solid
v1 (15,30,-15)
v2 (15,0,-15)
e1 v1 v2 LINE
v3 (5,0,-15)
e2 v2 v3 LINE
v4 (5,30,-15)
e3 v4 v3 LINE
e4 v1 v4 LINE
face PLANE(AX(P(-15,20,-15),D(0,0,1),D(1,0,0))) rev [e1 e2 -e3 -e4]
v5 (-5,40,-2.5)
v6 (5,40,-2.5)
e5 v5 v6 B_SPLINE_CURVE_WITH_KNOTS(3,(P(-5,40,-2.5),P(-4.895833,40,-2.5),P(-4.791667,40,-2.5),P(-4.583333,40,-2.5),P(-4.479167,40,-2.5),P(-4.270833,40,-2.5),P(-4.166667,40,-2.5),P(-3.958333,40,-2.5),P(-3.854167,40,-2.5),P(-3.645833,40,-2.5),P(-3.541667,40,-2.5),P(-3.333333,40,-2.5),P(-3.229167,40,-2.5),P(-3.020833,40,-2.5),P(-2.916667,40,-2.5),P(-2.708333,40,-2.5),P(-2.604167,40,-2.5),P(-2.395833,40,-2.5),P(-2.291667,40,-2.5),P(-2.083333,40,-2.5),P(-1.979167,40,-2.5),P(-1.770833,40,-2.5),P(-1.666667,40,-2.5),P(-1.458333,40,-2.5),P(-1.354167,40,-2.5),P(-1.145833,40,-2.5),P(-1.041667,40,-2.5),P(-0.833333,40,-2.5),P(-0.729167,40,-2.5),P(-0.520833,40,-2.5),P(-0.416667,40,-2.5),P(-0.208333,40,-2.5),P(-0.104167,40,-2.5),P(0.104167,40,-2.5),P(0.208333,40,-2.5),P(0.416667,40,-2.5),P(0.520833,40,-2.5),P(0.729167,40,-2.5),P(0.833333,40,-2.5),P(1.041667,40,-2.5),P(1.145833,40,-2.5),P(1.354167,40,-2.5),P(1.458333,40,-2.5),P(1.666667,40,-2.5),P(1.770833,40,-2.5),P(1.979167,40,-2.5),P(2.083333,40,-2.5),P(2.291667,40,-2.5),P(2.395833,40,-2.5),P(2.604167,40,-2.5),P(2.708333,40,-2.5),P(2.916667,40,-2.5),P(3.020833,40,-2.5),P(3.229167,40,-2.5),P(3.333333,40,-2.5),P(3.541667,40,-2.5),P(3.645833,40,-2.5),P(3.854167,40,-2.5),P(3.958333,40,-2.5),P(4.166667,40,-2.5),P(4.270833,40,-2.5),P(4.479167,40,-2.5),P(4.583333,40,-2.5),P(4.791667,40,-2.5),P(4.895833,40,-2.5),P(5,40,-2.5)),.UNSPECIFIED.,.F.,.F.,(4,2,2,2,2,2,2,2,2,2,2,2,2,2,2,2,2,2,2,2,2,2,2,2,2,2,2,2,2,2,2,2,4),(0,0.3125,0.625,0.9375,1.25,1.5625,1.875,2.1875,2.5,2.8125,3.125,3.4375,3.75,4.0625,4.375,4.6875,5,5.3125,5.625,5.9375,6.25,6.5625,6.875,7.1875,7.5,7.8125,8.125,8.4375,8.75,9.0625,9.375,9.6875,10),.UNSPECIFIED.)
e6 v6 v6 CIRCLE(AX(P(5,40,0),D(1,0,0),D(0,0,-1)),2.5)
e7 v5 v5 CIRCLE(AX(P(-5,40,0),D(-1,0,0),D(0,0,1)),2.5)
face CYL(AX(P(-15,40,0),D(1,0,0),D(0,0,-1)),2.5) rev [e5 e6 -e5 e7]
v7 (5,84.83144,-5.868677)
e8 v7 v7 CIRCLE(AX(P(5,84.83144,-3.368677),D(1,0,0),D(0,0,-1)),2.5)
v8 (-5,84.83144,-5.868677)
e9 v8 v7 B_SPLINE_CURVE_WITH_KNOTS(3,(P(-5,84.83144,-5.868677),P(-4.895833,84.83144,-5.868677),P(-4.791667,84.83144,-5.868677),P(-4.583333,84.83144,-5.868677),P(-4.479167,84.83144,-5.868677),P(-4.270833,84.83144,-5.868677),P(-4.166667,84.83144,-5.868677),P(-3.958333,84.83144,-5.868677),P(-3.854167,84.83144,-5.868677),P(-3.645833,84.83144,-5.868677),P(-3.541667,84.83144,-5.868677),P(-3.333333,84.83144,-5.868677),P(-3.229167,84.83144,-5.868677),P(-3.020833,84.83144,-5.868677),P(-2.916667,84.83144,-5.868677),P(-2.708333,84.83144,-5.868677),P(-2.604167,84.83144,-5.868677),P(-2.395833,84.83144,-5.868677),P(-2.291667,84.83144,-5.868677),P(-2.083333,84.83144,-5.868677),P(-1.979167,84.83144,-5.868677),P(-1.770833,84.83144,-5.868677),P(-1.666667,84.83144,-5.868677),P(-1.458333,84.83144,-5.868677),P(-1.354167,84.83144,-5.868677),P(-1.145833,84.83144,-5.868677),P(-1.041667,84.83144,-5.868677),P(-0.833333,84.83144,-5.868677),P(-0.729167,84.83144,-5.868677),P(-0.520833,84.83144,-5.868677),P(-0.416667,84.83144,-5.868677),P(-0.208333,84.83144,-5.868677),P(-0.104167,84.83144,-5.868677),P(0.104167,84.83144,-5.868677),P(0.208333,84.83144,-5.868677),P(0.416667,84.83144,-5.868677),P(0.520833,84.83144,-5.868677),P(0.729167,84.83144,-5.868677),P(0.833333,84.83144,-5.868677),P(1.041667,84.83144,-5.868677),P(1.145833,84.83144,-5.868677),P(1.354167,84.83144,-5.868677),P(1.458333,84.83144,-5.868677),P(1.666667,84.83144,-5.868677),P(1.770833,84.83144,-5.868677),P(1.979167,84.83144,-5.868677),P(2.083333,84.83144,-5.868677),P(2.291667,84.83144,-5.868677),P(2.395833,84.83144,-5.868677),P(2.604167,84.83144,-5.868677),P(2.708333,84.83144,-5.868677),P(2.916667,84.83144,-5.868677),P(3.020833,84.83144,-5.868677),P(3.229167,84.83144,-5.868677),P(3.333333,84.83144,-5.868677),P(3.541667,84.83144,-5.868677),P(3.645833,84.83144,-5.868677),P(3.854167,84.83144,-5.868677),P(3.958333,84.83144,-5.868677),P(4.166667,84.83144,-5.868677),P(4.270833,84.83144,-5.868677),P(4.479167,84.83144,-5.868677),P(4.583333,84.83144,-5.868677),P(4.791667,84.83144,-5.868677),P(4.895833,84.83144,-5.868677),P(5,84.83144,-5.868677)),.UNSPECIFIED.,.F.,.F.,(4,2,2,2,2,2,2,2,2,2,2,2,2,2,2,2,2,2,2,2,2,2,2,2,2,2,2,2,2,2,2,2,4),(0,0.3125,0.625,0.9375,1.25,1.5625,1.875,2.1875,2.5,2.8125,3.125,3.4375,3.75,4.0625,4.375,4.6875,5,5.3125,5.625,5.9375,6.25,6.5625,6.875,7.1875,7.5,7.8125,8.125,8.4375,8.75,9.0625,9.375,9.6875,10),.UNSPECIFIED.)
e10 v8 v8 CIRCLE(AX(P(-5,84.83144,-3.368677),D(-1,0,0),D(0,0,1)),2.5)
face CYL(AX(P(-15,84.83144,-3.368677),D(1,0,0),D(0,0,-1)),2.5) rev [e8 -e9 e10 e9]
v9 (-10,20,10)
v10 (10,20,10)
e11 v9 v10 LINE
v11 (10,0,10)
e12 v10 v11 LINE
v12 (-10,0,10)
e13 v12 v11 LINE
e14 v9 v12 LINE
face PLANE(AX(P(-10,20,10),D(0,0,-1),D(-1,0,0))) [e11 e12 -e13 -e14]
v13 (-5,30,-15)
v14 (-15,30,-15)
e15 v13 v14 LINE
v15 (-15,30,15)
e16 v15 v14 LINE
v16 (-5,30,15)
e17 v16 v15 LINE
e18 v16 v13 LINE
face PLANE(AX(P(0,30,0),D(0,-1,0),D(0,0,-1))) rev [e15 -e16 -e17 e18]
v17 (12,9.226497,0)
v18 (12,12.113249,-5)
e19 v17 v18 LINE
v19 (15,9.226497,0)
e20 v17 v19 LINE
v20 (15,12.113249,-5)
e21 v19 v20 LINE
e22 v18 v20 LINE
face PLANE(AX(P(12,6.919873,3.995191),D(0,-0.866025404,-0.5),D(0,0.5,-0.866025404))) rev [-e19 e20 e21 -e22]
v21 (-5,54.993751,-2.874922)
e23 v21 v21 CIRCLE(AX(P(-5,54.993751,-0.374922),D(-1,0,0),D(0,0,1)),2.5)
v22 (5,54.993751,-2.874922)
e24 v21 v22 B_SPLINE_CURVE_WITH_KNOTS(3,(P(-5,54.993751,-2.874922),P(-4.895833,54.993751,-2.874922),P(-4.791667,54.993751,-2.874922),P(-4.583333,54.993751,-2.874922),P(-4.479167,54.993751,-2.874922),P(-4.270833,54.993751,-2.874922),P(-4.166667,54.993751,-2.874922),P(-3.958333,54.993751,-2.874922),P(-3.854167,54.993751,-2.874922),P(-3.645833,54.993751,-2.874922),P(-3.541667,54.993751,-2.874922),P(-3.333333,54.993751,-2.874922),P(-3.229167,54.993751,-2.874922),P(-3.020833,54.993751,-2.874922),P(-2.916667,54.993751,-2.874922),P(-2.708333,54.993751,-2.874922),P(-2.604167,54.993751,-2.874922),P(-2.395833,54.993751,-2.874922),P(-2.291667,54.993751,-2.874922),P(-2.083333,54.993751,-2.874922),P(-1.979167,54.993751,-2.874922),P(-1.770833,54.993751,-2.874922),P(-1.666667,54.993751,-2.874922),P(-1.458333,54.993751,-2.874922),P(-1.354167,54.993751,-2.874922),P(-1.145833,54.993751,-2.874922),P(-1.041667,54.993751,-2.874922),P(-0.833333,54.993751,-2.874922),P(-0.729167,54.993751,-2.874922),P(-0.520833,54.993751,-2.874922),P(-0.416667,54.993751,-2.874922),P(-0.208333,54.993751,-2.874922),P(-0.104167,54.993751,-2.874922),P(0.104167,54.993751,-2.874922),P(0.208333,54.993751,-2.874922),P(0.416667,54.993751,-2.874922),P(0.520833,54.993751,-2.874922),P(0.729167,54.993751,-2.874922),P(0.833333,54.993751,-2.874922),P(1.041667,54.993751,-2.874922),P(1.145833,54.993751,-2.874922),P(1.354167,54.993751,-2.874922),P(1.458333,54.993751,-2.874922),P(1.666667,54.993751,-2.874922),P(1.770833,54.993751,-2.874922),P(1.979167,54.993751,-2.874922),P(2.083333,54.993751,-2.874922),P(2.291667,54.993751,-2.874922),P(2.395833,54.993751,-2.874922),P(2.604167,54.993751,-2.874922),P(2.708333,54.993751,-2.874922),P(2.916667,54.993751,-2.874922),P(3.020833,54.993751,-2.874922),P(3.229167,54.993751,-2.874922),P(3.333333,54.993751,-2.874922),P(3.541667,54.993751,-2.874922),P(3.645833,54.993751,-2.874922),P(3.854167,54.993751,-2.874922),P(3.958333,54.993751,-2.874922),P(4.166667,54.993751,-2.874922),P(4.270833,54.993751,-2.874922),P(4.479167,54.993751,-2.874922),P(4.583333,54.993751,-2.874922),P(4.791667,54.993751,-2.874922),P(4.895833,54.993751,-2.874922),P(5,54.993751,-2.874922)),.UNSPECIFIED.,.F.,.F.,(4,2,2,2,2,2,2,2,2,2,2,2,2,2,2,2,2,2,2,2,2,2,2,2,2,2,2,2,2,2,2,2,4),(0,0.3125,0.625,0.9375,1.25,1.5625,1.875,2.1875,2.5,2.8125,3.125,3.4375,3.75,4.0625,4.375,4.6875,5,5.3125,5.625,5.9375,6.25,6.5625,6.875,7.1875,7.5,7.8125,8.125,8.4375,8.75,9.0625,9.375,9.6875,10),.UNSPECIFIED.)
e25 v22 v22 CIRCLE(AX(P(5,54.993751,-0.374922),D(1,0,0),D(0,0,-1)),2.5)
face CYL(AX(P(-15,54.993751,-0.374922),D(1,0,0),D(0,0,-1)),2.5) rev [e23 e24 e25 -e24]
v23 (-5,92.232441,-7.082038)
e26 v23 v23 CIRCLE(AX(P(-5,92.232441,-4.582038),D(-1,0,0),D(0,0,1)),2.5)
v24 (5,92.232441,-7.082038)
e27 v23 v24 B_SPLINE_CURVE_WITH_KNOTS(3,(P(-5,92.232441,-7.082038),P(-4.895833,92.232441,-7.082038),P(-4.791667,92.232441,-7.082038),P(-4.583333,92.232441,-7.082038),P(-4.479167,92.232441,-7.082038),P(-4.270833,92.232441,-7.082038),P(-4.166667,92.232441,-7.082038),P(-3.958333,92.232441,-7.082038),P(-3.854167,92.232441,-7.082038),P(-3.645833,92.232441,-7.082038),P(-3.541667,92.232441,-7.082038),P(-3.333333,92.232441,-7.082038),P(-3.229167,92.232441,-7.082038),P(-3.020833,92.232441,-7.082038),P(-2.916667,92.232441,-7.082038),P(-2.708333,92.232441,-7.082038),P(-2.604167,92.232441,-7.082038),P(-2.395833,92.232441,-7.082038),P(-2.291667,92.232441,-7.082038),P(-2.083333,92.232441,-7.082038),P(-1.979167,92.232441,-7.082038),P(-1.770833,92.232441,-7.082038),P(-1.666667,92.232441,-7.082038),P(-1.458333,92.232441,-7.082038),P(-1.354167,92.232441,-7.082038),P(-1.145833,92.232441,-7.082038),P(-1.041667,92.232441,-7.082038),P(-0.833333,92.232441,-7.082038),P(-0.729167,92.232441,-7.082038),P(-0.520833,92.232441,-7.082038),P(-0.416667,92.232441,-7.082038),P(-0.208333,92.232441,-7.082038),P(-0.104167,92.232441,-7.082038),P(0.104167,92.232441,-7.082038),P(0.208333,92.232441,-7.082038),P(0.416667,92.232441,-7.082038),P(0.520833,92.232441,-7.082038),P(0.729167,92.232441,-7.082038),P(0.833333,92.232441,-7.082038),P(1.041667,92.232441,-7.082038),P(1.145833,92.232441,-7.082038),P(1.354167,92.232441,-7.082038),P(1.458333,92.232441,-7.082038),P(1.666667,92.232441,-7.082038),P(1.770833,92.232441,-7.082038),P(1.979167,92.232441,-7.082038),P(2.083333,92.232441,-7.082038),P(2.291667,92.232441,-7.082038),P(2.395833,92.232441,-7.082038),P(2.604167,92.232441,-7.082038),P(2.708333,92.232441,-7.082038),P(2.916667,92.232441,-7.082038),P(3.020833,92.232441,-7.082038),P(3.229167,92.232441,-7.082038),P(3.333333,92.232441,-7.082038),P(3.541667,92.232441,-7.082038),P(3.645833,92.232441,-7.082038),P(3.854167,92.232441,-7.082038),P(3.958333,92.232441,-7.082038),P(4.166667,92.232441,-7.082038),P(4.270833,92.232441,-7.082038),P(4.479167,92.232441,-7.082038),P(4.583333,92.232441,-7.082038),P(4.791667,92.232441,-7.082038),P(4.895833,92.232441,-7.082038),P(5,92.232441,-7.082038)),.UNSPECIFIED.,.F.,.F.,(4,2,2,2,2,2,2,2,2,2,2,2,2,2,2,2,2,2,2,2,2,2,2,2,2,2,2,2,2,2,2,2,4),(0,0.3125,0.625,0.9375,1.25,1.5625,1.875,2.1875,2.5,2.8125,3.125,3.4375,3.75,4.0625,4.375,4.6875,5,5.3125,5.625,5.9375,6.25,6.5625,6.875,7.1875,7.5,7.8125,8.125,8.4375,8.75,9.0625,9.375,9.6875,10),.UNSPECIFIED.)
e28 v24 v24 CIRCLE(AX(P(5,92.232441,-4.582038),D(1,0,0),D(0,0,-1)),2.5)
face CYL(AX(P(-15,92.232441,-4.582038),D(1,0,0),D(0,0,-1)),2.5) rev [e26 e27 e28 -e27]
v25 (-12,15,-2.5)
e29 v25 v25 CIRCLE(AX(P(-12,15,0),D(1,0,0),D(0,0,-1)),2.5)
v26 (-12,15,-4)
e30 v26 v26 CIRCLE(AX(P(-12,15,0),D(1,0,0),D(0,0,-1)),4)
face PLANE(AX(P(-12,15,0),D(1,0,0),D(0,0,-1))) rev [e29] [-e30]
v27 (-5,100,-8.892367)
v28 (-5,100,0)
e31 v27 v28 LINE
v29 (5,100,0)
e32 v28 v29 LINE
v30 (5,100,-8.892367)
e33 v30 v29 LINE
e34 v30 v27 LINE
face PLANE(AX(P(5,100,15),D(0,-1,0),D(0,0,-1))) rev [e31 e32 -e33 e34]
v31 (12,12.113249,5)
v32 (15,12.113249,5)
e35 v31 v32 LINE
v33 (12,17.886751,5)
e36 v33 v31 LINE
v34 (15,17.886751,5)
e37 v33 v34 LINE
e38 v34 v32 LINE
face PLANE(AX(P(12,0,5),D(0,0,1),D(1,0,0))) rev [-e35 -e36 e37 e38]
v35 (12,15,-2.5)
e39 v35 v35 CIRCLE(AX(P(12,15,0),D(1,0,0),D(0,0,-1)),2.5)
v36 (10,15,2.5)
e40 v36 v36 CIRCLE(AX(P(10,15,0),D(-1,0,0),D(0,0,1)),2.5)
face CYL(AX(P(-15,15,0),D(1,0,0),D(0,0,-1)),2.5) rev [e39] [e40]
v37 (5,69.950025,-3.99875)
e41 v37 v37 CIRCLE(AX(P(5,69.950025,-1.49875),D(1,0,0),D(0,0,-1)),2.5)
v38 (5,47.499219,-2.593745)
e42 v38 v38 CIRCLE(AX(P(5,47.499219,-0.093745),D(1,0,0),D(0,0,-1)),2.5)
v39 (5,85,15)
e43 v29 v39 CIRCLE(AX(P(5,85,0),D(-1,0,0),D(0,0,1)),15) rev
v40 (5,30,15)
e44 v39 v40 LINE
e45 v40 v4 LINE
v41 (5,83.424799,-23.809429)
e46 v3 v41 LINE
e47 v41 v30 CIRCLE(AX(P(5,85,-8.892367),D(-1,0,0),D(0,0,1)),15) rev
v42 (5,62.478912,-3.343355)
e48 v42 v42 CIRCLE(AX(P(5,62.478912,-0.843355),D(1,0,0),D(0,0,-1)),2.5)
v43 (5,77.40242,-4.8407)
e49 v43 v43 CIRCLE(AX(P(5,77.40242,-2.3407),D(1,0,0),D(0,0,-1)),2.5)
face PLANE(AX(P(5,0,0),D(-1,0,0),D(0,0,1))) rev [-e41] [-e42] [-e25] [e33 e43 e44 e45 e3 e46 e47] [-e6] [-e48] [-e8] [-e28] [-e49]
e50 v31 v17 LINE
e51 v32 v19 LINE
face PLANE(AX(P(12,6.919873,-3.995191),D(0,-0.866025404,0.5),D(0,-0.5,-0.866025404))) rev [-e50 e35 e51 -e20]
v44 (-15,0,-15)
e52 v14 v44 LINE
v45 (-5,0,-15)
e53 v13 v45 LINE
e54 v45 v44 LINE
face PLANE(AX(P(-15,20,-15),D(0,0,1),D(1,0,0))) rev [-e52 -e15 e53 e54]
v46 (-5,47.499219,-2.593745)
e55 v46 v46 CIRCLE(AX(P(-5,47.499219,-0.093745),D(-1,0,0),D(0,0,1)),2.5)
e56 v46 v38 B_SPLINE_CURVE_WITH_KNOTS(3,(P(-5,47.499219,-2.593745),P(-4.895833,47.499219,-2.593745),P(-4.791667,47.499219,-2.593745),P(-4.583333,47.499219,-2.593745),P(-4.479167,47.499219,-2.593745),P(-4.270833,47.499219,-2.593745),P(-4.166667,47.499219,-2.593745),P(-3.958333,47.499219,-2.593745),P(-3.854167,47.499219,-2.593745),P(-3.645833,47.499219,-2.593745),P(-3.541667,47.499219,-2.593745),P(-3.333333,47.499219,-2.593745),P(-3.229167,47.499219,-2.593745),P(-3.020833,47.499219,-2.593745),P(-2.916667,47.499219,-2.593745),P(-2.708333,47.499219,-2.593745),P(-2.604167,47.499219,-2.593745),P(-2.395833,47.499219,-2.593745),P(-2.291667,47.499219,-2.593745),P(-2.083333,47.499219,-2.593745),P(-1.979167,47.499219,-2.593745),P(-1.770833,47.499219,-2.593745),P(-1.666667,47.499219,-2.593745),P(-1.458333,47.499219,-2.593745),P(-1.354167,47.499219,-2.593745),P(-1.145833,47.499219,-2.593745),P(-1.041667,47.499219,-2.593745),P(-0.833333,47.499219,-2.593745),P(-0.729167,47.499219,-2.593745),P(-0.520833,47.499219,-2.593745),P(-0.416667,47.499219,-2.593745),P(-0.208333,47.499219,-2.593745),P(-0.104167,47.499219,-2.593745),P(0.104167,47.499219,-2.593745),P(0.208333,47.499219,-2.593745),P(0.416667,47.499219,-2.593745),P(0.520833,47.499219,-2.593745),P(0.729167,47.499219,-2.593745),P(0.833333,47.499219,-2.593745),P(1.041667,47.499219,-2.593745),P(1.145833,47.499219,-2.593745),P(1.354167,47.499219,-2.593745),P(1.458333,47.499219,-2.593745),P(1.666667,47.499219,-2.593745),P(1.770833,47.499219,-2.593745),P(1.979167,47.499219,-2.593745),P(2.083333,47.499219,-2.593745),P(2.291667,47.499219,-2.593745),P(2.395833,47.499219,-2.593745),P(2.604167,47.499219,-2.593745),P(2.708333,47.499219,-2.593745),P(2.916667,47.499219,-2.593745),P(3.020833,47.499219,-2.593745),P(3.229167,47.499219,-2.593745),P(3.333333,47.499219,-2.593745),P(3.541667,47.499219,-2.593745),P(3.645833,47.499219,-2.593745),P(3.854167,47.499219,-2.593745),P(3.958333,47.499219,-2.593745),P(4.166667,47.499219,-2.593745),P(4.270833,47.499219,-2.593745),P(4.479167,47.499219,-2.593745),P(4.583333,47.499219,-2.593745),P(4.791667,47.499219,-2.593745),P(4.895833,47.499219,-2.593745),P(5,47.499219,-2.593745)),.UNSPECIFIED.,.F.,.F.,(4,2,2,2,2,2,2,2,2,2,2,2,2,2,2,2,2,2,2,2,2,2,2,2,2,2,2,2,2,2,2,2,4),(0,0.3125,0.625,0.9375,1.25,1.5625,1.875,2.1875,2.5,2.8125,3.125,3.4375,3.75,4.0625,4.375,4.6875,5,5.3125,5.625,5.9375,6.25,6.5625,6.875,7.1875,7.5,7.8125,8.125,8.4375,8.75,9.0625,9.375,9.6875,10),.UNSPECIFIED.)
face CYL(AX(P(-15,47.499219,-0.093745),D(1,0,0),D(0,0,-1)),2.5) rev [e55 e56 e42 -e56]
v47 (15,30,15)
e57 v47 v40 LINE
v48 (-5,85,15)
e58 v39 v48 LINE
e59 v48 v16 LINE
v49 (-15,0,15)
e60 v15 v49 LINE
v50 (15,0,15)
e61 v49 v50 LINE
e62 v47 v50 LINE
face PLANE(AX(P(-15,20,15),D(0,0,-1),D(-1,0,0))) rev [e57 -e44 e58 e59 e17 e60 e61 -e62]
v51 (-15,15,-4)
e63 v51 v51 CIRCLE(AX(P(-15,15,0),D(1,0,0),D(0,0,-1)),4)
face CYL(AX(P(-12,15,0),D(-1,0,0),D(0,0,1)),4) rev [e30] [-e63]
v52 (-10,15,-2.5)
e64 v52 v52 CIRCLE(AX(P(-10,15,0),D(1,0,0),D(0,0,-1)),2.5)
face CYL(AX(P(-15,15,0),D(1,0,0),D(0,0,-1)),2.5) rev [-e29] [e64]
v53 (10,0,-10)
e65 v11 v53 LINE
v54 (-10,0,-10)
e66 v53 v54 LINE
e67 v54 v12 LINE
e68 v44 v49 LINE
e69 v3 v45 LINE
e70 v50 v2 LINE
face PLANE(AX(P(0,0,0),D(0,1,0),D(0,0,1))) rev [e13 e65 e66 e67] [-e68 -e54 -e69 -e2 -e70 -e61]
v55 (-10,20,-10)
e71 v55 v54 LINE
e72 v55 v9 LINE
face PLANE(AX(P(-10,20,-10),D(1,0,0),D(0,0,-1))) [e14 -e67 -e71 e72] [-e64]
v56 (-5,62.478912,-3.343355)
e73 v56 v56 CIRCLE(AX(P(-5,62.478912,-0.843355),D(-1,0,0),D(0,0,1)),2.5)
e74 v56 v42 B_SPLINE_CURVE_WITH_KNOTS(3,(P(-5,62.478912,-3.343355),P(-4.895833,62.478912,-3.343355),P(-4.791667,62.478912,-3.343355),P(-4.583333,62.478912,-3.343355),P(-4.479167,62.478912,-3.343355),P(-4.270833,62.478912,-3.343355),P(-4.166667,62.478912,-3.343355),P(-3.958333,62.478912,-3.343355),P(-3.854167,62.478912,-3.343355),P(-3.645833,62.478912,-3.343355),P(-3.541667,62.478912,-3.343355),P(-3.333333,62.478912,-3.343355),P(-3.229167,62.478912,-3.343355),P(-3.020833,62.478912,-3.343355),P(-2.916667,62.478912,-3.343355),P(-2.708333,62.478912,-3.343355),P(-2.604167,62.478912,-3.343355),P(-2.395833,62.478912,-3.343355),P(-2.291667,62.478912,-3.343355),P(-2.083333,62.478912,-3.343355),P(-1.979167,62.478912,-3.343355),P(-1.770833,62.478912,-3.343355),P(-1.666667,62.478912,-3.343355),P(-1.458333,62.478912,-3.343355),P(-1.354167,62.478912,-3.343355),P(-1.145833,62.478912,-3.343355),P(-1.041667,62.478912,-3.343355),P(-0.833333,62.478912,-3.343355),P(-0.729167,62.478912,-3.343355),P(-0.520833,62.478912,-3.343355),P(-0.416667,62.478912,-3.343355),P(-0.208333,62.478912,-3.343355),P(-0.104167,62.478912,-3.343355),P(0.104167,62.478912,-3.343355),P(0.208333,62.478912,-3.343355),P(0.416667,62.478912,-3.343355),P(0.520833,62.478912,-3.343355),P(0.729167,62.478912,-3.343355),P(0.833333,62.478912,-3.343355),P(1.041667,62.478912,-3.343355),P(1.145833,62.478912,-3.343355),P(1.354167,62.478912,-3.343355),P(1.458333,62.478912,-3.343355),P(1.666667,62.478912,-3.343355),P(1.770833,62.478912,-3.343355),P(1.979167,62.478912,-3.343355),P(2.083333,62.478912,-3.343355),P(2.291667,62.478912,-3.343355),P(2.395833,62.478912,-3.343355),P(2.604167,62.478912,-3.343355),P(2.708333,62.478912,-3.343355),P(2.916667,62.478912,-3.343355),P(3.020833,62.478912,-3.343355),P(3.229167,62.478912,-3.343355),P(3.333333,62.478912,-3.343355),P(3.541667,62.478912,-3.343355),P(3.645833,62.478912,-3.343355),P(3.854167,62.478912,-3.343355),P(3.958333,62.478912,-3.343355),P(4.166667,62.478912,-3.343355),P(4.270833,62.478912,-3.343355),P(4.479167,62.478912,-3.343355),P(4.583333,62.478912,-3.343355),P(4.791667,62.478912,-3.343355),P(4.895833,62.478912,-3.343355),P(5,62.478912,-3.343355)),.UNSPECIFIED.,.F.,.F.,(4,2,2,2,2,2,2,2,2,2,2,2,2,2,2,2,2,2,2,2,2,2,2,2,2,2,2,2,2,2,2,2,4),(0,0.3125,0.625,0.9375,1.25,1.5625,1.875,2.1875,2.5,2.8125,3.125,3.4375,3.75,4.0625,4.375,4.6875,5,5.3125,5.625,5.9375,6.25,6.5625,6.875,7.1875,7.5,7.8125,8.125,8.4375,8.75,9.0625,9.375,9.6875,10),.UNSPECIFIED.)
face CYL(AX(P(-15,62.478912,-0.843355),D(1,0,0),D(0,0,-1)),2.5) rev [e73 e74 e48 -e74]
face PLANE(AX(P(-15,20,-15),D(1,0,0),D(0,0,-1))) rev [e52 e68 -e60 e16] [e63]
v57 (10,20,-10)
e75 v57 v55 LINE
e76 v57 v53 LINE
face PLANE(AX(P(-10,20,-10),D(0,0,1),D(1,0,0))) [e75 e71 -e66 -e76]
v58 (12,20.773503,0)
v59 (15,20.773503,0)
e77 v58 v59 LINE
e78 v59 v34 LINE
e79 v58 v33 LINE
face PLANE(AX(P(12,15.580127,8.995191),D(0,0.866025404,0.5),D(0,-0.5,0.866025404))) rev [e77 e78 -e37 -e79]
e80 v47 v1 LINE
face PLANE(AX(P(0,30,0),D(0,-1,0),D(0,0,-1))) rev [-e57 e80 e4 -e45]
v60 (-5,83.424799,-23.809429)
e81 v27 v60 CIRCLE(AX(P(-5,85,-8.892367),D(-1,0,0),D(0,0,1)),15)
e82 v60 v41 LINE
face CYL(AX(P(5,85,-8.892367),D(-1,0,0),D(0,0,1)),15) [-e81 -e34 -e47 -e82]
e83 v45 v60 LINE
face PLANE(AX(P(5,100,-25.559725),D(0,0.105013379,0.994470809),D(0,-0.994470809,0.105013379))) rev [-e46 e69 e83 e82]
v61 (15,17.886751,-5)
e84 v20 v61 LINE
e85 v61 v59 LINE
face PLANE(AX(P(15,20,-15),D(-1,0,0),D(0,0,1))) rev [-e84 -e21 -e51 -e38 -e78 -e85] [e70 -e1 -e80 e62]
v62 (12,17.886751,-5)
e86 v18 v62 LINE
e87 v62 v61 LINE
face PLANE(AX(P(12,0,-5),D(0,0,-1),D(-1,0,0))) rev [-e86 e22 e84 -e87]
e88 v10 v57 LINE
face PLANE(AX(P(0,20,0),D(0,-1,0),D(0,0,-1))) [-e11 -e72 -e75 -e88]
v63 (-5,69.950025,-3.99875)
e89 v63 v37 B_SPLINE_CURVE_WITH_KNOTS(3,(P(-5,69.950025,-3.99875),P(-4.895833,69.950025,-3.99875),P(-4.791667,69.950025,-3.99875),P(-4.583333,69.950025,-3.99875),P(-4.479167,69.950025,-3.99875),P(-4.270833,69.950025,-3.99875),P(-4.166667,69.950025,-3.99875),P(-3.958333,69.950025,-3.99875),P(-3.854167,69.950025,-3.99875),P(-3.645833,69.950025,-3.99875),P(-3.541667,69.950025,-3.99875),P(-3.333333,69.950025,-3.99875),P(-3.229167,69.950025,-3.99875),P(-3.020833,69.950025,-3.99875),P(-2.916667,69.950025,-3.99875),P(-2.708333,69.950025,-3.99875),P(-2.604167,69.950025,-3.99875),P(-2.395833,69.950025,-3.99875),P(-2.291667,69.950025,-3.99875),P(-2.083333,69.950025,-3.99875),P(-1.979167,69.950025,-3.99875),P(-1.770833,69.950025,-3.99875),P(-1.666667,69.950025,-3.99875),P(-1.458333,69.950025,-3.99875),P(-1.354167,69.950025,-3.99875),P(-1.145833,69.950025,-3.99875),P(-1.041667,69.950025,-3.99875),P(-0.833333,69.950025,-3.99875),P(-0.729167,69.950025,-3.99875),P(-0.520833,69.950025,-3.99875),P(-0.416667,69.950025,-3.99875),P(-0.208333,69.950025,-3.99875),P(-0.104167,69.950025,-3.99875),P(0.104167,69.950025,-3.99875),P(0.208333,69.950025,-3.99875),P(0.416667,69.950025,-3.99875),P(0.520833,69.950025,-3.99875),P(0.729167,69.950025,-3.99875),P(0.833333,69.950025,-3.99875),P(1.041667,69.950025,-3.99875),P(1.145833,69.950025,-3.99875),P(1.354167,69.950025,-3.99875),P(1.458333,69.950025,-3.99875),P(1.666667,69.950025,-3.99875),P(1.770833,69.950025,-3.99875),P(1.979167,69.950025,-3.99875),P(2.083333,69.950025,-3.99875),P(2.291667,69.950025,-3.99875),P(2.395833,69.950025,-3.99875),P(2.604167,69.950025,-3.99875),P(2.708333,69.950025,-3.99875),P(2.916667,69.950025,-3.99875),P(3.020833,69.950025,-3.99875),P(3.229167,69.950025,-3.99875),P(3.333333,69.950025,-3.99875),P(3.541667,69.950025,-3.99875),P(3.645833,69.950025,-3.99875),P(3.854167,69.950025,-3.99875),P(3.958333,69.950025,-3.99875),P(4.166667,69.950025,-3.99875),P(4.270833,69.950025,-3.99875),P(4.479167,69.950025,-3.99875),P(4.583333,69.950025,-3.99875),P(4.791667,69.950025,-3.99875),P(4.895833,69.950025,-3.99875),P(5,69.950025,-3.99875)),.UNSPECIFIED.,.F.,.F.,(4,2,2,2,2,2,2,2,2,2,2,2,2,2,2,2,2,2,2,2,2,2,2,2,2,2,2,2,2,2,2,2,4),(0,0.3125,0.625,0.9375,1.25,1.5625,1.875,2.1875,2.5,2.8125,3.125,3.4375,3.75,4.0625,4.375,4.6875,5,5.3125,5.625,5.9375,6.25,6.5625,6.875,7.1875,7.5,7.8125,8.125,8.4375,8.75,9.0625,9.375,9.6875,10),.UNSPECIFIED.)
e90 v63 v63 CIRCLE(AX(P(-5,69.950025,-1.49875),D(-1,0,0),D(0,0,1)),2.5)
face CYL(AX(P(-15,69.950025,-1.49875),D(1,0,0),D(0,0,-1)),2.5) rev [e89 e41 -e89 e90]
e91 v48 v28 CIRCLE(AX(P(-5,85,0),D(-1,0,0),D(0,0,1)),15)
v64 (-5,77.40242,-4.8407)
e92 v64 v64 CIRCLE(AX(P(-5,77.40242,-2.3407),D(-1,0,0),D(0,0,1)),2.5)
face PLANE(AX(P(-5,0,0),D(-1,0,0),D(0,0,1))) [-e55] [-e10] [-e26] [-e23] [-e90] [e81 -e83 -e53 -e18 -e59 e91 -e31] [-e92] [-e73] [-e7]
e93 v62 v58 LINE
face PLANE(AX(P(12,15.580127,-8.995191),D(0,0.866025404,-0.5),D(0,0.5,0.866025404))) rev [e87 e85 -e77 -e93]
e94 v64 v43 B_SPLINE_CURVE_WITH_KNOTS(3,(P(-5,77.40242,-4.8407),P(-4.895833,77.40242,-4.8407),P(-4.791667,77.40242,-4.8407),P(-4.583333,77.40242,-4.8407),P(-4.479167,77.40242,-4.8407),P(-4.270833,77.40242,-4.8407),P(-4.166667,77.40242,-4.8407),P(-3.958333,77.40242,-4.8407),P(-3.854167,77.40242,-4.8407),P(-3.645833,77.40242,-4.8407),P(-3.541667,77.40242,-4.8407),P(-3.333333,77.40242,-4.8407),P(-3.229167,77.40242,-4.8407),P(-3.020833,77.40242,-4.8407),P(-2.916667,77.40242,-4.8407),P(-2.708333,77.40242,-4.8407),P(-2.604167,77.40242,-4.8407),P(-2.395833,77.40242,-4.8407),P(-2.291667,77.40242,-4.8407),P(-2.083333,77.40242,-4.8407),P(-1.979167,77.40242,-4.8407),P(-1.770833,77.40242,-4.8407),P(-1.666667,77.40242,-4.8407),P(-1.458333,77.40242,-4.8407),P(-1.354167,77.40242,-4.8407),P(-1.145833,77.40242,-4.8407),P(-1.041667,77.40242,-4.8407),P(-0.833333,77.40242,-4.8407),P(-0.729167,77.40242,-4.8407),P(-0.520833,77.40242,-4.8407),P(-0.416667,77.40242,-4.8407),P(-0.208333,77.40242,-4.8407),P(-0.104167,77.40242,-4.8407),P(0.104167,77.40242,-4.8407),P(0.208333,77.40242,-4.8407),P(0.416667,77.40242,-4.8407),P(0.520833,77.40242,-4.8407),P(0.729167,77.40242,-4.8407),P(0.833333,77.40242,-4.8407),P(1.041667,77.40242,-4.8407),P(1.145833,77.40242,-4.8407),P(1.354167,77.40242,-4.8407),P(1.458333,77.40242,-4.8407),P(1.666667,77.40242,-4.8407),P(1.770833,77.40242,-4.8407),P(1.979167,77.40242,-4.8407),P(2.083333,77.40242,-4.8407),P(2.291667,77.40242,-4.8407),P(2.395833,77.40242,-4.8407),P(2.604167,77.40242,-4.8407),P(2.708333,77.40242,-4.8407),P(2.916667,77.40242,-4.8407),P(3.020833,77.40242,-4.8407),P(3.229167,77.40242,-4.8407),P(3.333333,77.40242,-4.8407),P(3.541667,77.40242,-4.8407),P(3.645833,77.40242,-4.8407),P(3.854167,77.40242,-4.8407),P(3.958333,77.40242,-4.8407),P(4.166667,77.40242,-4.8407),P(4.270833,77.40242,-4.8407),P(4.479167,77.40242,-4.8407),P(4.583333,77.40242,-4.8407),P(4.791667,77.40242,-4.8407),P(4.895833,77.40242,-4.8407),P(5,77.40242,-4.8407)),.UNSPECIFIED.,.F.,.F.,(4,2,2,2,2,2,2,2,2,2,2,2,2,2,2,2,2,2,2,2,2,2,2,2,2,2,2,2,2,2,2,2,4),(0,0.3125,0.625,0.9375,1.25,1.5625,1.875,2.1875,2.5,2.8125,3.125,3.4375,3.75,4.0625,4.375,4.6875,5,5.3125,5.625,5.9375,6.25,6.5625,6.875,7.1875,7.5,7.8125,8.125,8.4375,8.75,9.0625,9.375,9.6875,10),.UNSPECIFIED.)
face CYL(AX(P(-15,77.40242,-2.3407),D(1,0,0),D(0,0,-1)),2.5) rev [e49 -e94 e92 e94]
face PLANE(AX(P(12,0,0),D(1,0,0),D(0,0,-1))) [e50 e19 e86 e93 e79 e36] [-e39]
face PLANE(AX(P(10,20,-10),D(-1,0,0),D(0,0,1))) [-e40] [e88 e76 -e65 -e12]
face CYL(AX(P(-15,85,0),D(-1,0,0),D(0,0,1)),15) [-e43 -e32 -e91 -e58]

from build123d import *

# Parameters (mm, degrees)
SKETCH1_W             = 30
SKETCH1_H             = 30
SKETCH1_W_2           = 20
SKETCH1_H_2           = 20
BOSS_EXTRUDE1_DEPTH   = 20
BOSS_EXTRUDE2_START   = 20
SKETCH1_2_W           = 30
SKETCH1_2_H           = 30
SKETCH1_2_W_2         = 20
SKETCH1_2_H_2         = 20
BOSS_EXTRUDE2_DEPTH   = 10
SKETCH3_R             = 2.5
CUT_EXTRUDE1_DEPTH    = 46
SKETCH3_3_R           = 4
SKETCH3_3_R_2         = 2.5
CUT_EXTRUDE2_DEPTH    = 3
CUT_EXTRUDE3_START    = -27
SKETCH3_4_R           = 4
SKETCH3_4_R_2         = 2.5
CUT_EXTRUDE3_DEPTH    = 3
BOSS_EXTRUDE4_DEPTH   = 5
FILLET2_R             = 15
SKETCH7_R             = 2.5
CUT_EXTRUDE5_DEPTH    = 105.74180253
CRVPATTERN1_START     = -5
CRVPATTERN1_OUTLINE_R = 2.5
CRVPATTERN1_DEPTH     = 10


# Read off the part's stored shape, not the designer's step: CrvPattern1
with BuildPart() as part:
    # Sketch1 → Boss-Extrude1 (new body)
    with BuildSketch(Plane(origin=(0, 0, 0), x_dir=(1, 0, 0), z_dir=(0, 1, 0))):
        Rectangle(SKETCH1_W, SKETCH1_H)
        Rectangle(SKETCH1_W_2, SKETCH1_H_2, mode=Mode.SUBTRACT)
    extrude(amount=BOSS_EXTRUDE1_DEPTH)

    # Sketch1<2> → Boss-Extrude2 (add)
    # profile 1 of 2: a face of its own
    with BuildSketch(Plane(origin=(0, 0, 0), x_dir=(1, 0, 0), z_dir=(0, 1, 0)).offset(BOSS_EXTRUDE2_START)):
        Rectangle(SKETCH1_2_W, SKETCH1_2_H)
        Rectangle(SKETCH1_2_W_2, SKETCH1_2_H_2, mode=Mode.SUBTRACT)
    # profile 2 of 2: a face of its own
    with BuildSketch(Plane(origin=(0, 0, 0), x_dir=(1, 0, 0), z_dir=(0, 1, 0)).offset(BOSS_EXTRUDE2_START)):
        Rectangle(SKETCH1_2_W_2, SKETCH1_2_H_2)
    extrude(amount=BOSS_EXTRUDE2_DEPTH)

    # Sketch3 → Cut-Extrude1 (cut, through all)
    with BuildSketch(Plane(origin=(15, 0, 0), x_dir=(0, 0, -1), z_dir=(1, 0, 0))):
        with Locations((0, 15)):
            Circle(SKETCH3_R)
    extrude(amount=-CUT_EXTRUDE1_DEPTH, mode=Mode.SUBTRACT)

    # Sketch3<3> → Cut-Extrude2 (cut)
    # profile 1 of 2: a face of its own
    with BuildSketch(Plane(origin=(15, 0, 0), x_dir=(0, 0, -1), z_dir=(1, 0, 0))):
        Polygon((-5, 17.886751346), (-5, 12.113248654), (0, 9.226497308), (5, 12.113248654), (5, 17.886751346), (0, 20.773502692), align=None)
        with Locations((0, 15)):
            Circle(SKETCH3_3_R, mode=Mode.SUBTRACT)
    # profile 2 of 2: a face of its own
    with BuildSketch(Plane(origin=(15, 0, 0), x_dir=(0, 0, -1), z_dir=(1, 0, 0))):
        with Locations((0, 15)):
            Circle(SKETCH3_3_R)
        with Locations((0, 15)):
            Circle(SKETCH3_3_R_2, mode=Mode.SUBTRACT)
    extrude(amount=-CUT_EXTRUDE2_DEPTH, mode=Mode.SUBTRACT)

    # Sketch3<4> → Cut-Extrude3 (cut)
    with BuildSketch(Plane(origin=(15, 0, 0), x_dir=(0, 0, -1), z_dir=(1, 0, 0)).offset(CUT_EXTRUDE3_START)):
        with Locations((0, 15)):
            Circle(SKETCH3_4_R)
        with Locations((0, 15)):
            Circle(SKETCH3_4_R_2, mode=Mode.SUBTRACT)
    extrude(amount=-CUT_EXTRUDE3_DEPTH, mode=Mode.SUBTRACT)

    # Sketch6 → Boss-Extrude4 (add, symmetric)
    with BuildSketch(Plane(origin=(0, 0, 0), x_dir=(0, 0, -1), z_dir=(1, 0, 0))):
        Polygon((-15, 30), (-15, 100), (25.559724605, 100), (15, 0), (15, 30), align=None)
    extrude(amount=BOSS_EXTRUDE4_DEPTH, both=True)

    # Fillet2
    fillet2_edges = [part.edges().sort_by_distance(p)[0] for p in [
        (0, 100, -25.559724605),
        (0, 100, 15),
    ]]
    fillet(fillet2_edges, radius=FILLET2_R)

    # Sketch7 → Cut-Extrude5 (cut, through all)
    with BuildSketch(Plane(origin=(5, 0, 0), x_dir=(0, 0, -1), z_dir=(1, 0, 0))):
        with Locations((0, 40)):
            Circle(SKETCH7_R)
    extrude(amount=-CUT_EXTRUDE5_DEPTH, mode=Mode.SUBTRACT)

    # CrvPattern1 outline → CrvPattern1 (cut)
    with BuildSketch(Plane.YZ.offset(CRVPATTERN1_START)):
        with Locations((47.499218774, -0.093745117)):
            Circle(CRVPATTERN1_OUTLINE_R)
        with Locations((92.232441278, -4.582038329)):
            Circle(CRVPATTERN1_OUTLINE_R)
        with Locations((84.831439742, -3.368676619)):
            Circle(CRVPATTERN1_OUTLINE_R)
        with Locations((77.402420016, -2.340699831)):
            Circle(CRVPATTERN1_OUTLINE_R)
        with Locations((69.950024994, -1.498750417)):
            Circle(CRVPATTERN1_OUTLINE_R)
        with Locations((62.478912182, -0.843354566)):
            Circle(CRVPATTERN1_OUTLINE_R)
        with Locations((54.993750781, -0.374921882)):
            Circle(CRVPATTERN1_OUTLINE_R)
    extrude(amount=CRVPATTERN1_DEPTH, mode=Mode.SUBTRACT)


solid = part.part
